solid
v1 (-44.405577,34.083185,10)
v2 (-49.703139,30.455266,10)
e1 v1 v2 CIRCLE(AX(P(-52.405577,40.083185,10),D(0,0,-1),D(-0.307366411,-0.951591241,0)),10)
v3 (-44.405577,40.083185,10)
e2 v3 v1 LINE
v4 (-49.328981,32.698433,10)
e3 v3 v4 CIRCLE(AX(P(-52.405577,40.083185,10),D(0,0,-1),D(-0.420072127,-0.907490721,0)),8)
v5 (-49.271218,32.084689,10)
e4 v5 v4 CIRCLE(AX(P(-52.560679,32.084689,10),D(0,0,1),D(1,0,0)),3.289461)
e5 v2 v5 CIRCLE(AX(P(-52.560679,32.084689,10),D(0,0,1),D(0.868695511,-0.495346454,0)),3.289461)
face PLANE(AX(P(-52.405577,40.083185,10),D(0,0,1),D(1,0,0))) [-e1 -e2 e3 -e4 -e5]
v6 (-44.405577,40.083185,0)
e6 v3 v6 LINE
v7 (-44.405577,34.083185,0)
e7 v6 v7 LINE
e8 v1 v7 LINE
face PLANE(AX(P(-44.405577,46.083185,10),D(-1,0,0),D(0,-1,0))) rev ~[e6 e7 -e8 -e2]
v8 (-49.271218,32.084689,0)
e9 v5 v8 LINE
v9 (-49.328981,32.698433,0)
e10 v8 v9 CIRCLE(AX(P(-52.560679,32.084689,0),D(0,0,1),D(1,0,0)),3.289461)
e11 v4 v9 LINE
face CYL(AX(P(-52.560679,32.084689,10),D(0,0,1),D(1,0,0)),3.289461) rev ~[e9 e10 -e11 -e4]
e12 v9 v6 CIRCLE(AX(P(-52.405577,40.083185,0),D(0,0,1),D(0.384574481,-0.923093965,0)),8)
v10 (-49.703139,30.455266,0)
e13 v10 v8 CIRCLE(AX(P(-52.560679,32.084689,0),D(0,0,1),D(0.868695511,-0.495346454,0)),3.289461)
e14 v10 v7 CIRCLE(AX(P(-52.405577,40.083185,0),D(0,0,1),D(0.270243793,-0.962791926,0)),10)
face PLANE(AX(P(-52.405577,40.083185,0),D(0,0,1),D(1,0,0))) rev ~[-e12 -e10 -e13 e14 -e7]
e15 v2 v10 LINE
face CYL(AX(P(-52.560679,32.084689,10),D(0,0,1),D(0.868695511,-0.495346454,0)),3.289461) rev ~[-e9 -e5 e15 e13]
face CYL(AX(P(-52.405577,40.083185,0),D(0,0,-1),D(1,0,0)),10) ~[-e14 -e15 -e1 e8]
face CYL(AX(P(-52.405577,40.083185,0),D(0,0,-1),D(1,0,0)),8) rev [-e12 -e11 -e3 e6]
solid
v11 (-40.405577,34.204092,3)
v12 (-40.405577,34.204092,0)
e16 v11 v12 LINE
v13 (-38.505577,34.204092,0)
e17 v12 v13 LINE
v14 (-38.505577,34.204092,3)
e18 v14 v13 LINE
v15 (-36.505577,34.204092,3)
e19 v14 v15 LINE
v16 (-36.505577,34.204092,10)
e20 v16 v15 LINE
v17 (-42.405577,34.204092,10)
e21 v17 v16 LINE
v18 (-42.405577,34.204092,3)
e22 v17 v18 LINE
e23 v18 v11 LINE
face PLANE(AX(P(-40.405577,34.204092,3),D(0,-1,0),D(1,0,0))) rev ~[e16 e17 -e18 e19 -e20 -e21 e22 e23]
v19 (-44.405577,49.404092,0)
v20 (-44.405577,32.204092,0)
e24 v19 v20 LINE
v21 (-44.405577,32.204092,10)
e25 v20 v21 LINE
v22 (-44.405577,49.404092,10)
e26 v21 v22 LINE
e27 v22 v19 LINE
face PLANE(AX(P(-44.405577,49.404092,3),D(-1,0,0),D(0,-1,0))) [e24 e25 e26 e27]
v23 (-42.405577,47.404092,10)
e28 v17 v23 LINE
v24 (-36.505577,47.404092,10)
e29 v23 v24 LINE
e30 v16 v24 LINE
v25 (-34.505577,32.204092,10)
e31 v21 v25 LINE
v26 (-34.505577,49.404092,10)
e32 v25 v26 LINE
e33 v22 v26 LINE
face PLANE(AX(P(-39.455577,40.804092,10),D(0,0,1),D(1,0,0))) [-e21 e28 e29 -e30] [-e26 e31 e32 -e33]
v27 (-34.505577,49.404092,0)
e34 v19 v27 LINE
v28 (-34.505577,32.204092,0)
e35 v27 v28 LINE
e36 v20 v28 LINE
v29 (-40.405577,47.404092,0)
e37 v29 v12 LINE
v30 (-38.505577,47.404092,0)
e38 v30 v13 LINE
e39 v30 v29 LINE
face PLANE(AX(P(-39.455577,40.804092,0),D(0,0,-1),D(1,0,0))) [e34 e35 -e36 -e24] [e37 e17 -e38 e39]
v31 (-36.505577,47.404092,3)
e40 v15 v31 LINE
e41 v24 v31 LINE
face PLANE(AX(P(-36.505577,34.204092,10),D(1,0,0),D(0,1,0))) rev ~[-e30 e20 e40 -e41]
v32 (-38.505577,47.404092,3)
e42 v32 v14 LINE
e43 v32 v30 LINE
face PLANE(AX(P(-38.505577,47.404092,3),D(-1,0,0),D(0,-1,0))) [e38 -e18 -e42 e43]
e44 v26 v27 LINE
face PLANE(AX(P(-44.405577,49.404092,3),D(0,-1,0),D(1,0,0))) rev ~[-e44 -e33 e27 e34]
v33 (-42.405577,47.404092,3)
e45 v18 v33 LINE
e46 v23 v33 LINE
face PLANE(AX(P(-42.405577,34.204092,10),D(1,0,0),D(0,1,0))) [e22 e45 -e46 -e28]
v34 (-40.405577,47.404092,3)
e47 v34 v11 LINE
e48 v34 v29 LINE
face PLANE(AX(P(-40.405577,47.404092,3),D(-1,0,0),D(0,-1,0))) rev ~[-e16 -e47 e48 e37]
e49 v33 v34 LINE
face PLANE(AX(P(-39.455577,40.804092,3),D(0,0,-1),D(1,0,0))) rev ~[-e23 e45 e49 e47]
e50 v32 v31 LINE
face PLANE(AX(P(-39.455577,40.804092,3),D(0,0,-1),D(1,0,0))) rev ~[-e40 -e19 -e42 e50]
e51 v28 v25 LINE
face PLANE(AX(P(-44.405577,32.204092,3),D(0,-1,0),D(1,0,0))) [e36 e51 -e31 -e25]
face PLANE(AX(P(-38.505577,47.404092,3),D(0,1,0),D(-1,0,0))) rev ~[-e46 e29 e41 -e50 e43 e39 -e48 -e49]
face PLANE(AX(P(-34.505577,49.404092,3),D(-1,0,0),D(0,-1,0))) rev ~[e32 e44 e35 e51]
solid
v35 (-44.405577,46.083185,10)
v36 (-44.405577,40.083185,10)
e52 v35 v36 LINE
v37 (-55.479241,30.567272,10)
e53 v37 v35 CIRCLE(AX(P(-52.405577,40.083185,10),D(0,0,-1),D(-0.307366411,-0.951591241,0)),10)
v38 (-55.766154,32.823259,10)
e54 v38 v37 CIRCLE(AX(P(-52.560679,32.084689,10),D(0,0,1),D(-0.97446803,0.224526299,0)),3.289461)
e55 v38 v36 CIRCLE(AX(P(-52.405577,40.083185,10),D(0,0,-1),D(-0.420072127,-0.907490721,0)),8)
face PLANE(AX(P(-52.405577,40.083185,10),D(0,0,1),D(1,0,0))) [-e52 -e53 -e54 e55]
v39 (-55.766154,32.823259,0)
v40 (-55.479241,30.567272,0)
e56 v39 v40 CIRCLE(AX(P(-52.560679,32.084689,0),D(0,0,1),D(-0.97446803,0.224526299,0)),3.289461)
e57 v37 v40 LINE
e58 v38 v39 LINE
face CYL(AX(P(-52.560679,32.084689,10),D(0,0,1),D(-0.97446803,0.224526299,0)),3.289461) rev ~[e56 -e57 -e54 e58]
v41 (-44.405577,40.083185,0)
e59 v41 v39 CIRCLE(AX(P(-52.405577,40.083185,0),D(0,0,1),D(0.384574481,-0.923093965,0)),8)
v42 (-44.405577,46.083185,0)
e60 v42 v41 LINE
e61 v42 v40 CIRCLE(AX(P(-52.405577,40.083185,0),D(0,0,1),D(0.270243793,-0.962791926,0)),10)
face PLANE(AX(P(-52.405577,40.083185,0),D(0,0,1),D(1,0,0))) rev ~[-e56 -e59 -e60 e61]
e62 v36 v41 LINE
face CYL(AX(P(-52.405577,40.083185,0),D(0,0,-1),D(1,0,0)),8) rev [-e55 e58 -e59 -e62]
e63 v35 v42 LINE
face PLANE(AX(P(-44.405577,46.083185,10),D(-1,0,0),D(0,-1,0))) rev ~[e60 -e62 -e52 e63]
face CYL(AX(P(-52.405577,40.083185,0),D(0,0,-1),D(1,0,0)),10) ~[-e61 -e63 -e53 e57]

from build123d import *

# Parameters (mm, degrees)
F0_R      = 10
F0_R_2    = 8
F1_DEPTH  = 10
F3_DEPTH  = 10.001
F5_DEPTH  = 10.001
F4_W      = 9.9
F4_H      = 17.2
F6_DEPTH  = 7
F7_W      = 5.9
F7_H      = 13.2
F8_DEPTH  = 25
F9_W      = 9.9
F9_H      = 17.2
F9_W_2    = 2
F9_H_2    = 13.2
F10_DEPTH = 3


# Not quite as in the source:
# - a feature names something its author has since deleted; it is built from what else it names


with BuildPart() as f1:
    # F0 (on Top) → F1 (new body)
    with BuildSketch(Plane.XY):
        with Locations((-52.405577153, 40.0831848383)):
            Circle(F0_R)
        with Locations((-52.405577153, 40.0831848383)):
            Circle(F0_R_2, mode=Mode.SUBTRACT)
    extrude(amount=F1_DEPTH)

    # F2 (on face) → F3 (cut, through all)
    with BuildSketch(Plane.XY.offset(10)):
        with BuildLine():
            ThreePointArc((-49.7031392182, 30.4552655818), (-49.3810314173, 31.2418399469), (-49.2712181951, 32.0846885237))
            ThreePointArc((-49.2712181951, 32.0846885237), (-49.2856908096, 32.3929169306), (-49.3289813029, 32.6984331177))
            ThreePointArc((-49.3289813029, 32.6984331177), (-52.5606793952, 32.0846885237), (-55.7661541698, 32.8232590732))
            ThreePointArc((-55.7661541698, 32.8232590732), (-55.8238565493, 31.6696826825), (-55.4792412657, 30.5672724321))
            ThreePointArc((-55.4792412657, 30.5672724321), (-52.5994549558, 30.0850644451), (-49.7031392182, 30.4552655818))
        make_face()
    extrude(amount=-F3_DEPTH, mode=Mode.SUBTRACT)

    # F4 (on face) → F5 (cut, through all)
    with BuildSketch(Plane.XY.offset(10)):
        with BuildLine():
            ThreePointArc((-44.405577153, 34.0831848383), (-42.405577153, 40.0831848383), (-44.405577153, 46.0831848383))
            Line((-44.405577153, 46.0831848383), (-44.405577153, 40.0831848383))
            Line((-44.405577153, 40.0831848383), (-44.405577153, 34.0831848383))
        make_face()
    extrude(amount=-F5_DEPTH, mode=Mode.SUBTRACT)


with BuildPart() as f6:
    # F4 (on face) → F6 (new body)
    with BuildSketch(Plane.XY.offset(10)):
        with Locations((-39.455577153, 40.8040919366)):
            Rectangle(F4_W, F4_H)
    extrude(amount=-F6_DEPTH)

    # F7 (on face) → F8 (cut)
    with BuildSketch(Plane.XY.offset(10)):
        with Locations((-39.455577153, 40.8040919366)):
            Rectangle(F7_W, F7_H)
    extrude(amount=-F8_DEPTH, mode=Mode.SUBTRACT)

    # F9 (on face) → F10 (join)
    with BuildSketch(Plane(origin=(0, 0, 3), x_dir=(1, 0, 0), z_dir=(0, 0, -1))):
        with Locations((-39.455577153, -40.8040919366)):
            Rectangle(F9_W, F9_H)
        Polygon((-42.405577153, -47.4040919366), (-42.405577153, -34.2040919366), (-40.405577153, -34.2040919366), (-38.505577153, -34.2040919366), (-36.505577153, -34.2040919366), (-36.505577153, -47.4040919366), (-38.505577153, -47.4040919366), (-40.405577153, -47.4040919366), align=None, mode=Mode.SUBTRACT)
        with Locations((-41.405577153, -40.8040919366)):
            Rectangle(F9_W_2, F9_H_2)
        with Locations((-37.505577153, -40.8040919366)):
            Rectangle(F9_W_2, F9_H_2)
    extrude(amount=F10_DEPTH)


solid = Compound([f1.part, f6.part])
